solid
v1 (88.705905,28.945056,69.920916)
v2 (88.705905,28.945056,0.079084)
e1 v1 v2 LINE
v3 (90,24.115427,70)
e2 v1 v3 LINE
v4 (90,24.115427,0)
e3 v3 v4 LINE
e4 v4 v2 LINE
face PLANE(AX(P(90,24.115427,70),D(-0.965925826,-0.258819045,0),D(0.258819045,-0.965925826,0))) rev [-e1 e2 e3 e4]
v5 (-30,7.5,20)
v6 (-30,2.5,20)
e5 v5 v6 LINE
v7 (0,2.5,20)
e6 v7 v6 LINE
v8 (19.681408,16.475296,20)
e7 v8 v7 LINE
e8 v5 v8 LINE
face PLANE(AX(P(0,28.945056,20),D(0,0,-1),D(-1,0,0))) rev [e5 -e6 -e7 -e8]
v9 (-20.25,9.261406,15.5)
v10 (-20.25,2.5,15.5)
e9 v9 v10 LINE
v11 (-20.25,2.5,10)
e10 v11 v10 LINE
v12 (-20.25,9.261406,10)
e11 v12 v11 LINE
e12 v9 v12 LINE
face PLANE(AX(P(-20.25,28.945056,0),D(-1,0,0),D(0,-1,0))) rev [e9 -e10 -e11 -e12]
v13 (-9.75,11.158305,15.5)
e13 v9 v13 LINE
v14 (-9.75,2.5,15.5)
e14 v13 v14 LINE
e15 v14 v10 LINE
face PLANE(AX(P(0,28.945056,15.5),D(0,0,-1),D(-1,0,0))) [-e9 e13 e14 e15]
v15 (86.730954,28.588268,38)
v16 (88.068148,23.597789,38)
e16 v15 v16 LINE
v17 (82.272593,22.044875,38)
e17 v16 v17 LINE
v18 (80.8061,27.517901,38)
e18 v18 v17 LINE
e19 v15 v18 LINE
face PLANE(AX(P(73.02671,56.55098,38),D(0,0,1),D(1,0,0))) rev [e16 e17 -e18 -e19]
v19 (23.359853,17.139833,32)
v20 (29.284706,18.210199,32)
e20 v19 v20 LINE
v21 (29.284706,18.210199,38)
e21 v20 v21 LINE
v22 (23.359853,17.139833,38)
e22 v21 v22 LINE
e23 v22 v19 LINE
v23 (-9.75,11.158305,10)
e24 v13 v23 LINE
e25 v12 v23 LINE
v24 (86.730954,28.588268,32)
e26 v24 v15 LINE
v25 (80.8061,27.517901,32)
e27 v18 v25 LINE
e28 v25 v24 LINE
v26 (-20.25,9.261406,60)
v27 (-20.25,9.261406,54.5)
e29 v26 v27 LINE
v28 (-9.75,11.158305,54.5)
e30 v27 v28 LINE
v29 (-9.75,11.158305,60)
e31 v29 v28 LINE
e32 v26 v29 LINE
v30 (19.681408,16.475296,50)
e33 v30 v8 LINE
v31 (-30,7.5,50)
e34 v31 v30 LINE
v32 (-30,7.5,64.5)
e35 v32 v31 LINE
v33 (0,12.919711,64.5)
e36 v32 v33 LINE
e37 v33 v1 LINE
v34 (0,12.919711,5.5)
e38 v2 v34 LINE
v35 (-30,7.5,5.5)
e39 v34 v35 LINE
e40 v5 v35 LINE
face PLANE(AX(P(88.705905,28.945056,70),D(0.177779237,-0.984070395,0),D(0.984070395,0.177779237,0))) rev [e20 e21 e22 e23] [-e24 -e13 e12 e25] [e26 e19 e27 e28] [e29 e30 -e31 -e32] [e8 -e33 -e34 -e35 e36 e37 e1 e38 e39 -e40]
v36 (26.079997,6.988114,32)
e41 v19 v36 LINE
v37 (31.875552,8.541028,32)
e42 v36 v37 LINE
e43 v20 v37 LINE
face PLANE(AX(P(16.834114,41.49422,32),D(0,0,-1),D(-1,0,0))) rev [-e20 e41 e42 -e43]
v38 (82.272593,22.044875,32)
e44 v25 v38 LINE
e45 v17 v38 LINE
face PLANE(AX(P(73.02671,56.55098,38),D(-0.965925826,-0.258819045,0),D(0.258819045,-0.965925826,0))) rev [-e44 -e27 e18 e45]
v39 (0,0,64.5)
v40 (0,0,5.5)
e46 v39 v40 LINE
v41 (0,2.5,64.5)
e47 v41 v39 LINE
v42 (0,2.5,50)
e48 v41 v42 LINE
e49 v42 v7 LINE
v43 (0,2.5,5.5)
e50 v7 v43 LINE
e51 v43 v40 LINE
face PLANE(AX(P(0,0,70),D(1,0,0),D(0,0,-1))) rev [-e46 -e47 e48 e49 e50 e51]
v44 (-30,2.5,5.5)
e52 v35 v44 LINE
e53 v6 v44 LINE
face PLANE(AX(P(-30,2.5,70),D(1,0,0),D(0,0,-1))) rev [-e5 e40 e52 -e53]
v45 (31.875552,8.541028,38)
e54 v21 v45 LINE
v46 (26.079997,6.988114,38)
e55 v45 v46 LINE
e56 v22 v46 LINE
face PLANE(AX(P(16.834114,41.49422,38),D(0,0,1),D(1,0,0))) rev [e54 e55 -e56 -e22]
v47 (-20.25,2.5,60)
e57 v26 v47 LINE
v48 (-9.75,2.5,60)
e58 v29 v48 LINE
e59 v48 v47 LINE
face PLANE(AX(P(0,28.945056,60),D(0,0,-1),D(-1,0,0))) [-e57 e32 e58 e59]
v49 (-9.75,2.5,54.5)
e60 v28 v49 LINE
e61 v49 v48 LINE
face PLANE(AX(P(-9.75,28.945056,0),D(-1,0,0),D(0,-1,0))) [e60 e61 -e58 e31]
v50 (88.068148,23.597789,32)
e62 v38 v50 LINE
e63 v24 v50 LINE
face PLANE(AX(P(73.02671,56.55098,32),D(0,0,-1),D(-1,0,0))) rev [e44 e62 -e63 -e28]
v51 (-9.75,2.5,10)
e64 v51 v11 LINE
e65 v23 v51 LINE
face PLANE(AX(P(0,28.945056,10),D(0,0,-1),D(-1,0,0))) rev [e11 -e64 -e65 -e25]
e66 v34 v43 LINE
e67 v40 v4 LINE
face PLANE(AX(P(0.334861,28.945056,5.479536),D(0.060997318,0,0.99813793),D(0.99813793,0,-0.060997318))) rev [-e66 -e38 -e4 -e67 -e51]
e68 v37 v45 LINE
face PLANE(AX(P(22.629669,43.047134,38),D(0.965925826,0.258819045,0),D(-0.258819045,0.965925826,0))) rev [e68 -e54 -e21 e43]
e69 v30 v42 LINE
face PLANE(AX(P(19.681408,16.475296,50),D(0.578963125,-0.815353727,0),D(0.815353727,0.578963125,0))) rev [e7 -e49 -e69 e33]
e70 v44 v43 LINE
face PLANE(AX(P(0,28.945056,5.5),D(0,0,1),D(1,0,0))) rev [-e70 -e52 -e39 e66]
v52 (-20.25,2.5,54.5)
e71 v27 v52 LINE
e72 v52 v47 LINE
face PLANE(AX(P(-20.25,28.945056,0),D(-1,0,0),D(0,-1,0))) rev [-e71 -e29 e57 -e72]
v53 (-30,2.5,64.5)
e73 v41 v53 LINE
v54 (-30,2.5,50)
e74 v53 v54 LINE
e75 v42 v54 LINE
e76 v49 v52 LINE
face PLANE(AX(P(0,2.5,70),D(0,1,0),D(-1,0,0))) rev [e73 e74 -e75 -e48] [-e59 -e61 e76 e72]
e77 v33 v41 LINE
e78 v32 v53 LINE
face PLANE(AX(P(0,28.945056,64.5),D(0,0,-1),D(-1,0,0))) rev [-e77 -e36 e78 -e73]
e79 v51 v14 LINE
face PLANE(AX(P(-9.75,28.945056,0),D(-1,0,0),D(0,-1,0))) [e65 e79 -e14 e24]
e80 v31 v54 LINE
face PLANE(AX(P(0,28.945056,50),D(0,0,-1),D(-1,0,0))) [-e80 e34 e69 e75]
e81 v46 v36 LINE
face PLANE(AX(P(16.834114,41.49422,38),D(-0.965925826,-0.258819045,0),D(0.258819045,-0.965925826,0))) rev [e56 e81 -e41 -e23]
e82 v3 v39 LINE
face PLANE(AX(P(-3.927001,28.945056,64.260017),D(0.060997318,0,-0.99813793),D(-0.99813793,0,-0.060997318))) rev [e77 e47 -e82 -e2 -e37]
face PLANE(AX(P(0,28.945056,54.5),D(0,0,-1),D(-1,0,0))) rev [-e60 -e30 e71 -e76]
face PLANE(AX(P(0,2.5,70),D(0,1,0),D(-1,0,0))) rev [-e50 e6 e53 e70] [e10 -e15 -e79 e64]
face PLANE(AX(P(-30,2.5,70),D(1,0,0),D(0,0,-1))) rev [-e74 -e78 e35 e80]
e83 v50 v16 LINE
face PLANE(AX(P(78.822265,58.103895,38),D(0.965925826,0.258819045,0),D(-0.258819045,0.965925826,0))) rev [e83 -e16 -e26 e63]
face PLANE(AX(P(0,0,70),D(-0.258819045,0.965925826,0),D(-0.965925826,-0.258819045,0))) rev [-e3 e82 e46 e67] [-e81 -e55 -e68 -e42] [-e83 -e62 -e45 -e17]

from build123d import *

# Parameters (mm, degrees)
SALIENTE_EXTRUIR1_DEPTH    = 70
CORTAR_EXTRUIR1_DEPTH      = 118.04418401
CORTAR_EXTRUIR1_DEPTH_BACK = 118.04418401
CROQUIS2_W                 = 30
CROQUIS2_H                 = 30
CROQUIS2_W_2               = 10.5
CROQUIS2_H_2               = 5.5
CROQUIS3_W                 = 6
CROQUIS3_H                 = 6
CORTAR_EXTRUIR2_DEPTH      = 118.634247959
CORTAR_EXTRUIR3_DEPTH      = 15
CORTAR_EXTRUIR3_DEPTH_BACK = 15


with BuildPart() as part:
    # Croquis1 → Saliente-Extruir1 (new body)
    with BuildSketch(Plane.XY):
        Polygon((0, 0), (90, 24.115427319), (88.705904774, 28.94505645), (-30, 7.5), (-30, 2.5), (0, 2.5), align=None)
    extrude(amount=SALIENTE_EXTRUIR1_DEPTH)

    # Croquis2 → Cortar-Extruir1 (cut, two sides: drawn at the far end of the back side and taken through both)
    with BuildSketch(Plane.XZ.offset(-2.5).offset(-CORTAR_EXTRUIR1_DEPTH_BACK)):
        Polygon((-30, 70), (-30, 64.5), (0, 64.5), (90, 70), align=None)
        with Locations((-15, 35)):
            Rectangle(CROQUIS2_W, CROQUIS2_H)
        Polygon((0, 5.5), (-30, 5.5), (-30, 0), (90, 0), align=None)
        with Locations((-15, 12.75)):
            Rectangle(CROQUIS2_W_2, CROQUIS2_H_2)
        with Locations((-15, 57.25)):
            Rectangle(CROQUIS2_W_2, CROQUIS2_H_2)
    extrude(amount=CORTAR_EXTRUIR1_DEPTH + CORTAR_EXTRUIR1_DEPTH_BACK, mode=Mode.SUBTRACT)

    # Croquis3 → Cortar-Extruir2 (cut, through all)
    with BuildSketch(Plane(origin=(0, 0, 0), x_dir=(0.9659258262890692, 0.2588190451025179, 0), z_dir=(0.2588190451025179, -0.9659258262890692, 0))):
        with Locations((30, 35)):
            Rectangle(CROQUIS3_W, CROQUIS3_H)
        with Locations((88.174856237, 35)):
            Rectangle(CROQUIS3_W, CROQUIS3_H)
    extrude(amount=-CORTAR_EXTRUIR2_DEPTH, mode=Mode.SUBTRACT)

    # Croquis4 → Cortar-Extruir3 (cut, two sides: drawn at the far end of the back side and taken through both)
    with BuildSketch(Plane.XY.offset(35).offset(-CORTAR_EXTRUIR3_DEPTH_BACK)):
        Polygon((0, 2.5), (0, 12.919710963), (19.681407906, 16.475295703), align=None)
    extrude(amount=CORTAR_EXTRUIR3_DEPTH + CORTAR_EXTRUIR3_DEPTH_BACK, mode=Mode.SUBTRACT)


solid = part.part
